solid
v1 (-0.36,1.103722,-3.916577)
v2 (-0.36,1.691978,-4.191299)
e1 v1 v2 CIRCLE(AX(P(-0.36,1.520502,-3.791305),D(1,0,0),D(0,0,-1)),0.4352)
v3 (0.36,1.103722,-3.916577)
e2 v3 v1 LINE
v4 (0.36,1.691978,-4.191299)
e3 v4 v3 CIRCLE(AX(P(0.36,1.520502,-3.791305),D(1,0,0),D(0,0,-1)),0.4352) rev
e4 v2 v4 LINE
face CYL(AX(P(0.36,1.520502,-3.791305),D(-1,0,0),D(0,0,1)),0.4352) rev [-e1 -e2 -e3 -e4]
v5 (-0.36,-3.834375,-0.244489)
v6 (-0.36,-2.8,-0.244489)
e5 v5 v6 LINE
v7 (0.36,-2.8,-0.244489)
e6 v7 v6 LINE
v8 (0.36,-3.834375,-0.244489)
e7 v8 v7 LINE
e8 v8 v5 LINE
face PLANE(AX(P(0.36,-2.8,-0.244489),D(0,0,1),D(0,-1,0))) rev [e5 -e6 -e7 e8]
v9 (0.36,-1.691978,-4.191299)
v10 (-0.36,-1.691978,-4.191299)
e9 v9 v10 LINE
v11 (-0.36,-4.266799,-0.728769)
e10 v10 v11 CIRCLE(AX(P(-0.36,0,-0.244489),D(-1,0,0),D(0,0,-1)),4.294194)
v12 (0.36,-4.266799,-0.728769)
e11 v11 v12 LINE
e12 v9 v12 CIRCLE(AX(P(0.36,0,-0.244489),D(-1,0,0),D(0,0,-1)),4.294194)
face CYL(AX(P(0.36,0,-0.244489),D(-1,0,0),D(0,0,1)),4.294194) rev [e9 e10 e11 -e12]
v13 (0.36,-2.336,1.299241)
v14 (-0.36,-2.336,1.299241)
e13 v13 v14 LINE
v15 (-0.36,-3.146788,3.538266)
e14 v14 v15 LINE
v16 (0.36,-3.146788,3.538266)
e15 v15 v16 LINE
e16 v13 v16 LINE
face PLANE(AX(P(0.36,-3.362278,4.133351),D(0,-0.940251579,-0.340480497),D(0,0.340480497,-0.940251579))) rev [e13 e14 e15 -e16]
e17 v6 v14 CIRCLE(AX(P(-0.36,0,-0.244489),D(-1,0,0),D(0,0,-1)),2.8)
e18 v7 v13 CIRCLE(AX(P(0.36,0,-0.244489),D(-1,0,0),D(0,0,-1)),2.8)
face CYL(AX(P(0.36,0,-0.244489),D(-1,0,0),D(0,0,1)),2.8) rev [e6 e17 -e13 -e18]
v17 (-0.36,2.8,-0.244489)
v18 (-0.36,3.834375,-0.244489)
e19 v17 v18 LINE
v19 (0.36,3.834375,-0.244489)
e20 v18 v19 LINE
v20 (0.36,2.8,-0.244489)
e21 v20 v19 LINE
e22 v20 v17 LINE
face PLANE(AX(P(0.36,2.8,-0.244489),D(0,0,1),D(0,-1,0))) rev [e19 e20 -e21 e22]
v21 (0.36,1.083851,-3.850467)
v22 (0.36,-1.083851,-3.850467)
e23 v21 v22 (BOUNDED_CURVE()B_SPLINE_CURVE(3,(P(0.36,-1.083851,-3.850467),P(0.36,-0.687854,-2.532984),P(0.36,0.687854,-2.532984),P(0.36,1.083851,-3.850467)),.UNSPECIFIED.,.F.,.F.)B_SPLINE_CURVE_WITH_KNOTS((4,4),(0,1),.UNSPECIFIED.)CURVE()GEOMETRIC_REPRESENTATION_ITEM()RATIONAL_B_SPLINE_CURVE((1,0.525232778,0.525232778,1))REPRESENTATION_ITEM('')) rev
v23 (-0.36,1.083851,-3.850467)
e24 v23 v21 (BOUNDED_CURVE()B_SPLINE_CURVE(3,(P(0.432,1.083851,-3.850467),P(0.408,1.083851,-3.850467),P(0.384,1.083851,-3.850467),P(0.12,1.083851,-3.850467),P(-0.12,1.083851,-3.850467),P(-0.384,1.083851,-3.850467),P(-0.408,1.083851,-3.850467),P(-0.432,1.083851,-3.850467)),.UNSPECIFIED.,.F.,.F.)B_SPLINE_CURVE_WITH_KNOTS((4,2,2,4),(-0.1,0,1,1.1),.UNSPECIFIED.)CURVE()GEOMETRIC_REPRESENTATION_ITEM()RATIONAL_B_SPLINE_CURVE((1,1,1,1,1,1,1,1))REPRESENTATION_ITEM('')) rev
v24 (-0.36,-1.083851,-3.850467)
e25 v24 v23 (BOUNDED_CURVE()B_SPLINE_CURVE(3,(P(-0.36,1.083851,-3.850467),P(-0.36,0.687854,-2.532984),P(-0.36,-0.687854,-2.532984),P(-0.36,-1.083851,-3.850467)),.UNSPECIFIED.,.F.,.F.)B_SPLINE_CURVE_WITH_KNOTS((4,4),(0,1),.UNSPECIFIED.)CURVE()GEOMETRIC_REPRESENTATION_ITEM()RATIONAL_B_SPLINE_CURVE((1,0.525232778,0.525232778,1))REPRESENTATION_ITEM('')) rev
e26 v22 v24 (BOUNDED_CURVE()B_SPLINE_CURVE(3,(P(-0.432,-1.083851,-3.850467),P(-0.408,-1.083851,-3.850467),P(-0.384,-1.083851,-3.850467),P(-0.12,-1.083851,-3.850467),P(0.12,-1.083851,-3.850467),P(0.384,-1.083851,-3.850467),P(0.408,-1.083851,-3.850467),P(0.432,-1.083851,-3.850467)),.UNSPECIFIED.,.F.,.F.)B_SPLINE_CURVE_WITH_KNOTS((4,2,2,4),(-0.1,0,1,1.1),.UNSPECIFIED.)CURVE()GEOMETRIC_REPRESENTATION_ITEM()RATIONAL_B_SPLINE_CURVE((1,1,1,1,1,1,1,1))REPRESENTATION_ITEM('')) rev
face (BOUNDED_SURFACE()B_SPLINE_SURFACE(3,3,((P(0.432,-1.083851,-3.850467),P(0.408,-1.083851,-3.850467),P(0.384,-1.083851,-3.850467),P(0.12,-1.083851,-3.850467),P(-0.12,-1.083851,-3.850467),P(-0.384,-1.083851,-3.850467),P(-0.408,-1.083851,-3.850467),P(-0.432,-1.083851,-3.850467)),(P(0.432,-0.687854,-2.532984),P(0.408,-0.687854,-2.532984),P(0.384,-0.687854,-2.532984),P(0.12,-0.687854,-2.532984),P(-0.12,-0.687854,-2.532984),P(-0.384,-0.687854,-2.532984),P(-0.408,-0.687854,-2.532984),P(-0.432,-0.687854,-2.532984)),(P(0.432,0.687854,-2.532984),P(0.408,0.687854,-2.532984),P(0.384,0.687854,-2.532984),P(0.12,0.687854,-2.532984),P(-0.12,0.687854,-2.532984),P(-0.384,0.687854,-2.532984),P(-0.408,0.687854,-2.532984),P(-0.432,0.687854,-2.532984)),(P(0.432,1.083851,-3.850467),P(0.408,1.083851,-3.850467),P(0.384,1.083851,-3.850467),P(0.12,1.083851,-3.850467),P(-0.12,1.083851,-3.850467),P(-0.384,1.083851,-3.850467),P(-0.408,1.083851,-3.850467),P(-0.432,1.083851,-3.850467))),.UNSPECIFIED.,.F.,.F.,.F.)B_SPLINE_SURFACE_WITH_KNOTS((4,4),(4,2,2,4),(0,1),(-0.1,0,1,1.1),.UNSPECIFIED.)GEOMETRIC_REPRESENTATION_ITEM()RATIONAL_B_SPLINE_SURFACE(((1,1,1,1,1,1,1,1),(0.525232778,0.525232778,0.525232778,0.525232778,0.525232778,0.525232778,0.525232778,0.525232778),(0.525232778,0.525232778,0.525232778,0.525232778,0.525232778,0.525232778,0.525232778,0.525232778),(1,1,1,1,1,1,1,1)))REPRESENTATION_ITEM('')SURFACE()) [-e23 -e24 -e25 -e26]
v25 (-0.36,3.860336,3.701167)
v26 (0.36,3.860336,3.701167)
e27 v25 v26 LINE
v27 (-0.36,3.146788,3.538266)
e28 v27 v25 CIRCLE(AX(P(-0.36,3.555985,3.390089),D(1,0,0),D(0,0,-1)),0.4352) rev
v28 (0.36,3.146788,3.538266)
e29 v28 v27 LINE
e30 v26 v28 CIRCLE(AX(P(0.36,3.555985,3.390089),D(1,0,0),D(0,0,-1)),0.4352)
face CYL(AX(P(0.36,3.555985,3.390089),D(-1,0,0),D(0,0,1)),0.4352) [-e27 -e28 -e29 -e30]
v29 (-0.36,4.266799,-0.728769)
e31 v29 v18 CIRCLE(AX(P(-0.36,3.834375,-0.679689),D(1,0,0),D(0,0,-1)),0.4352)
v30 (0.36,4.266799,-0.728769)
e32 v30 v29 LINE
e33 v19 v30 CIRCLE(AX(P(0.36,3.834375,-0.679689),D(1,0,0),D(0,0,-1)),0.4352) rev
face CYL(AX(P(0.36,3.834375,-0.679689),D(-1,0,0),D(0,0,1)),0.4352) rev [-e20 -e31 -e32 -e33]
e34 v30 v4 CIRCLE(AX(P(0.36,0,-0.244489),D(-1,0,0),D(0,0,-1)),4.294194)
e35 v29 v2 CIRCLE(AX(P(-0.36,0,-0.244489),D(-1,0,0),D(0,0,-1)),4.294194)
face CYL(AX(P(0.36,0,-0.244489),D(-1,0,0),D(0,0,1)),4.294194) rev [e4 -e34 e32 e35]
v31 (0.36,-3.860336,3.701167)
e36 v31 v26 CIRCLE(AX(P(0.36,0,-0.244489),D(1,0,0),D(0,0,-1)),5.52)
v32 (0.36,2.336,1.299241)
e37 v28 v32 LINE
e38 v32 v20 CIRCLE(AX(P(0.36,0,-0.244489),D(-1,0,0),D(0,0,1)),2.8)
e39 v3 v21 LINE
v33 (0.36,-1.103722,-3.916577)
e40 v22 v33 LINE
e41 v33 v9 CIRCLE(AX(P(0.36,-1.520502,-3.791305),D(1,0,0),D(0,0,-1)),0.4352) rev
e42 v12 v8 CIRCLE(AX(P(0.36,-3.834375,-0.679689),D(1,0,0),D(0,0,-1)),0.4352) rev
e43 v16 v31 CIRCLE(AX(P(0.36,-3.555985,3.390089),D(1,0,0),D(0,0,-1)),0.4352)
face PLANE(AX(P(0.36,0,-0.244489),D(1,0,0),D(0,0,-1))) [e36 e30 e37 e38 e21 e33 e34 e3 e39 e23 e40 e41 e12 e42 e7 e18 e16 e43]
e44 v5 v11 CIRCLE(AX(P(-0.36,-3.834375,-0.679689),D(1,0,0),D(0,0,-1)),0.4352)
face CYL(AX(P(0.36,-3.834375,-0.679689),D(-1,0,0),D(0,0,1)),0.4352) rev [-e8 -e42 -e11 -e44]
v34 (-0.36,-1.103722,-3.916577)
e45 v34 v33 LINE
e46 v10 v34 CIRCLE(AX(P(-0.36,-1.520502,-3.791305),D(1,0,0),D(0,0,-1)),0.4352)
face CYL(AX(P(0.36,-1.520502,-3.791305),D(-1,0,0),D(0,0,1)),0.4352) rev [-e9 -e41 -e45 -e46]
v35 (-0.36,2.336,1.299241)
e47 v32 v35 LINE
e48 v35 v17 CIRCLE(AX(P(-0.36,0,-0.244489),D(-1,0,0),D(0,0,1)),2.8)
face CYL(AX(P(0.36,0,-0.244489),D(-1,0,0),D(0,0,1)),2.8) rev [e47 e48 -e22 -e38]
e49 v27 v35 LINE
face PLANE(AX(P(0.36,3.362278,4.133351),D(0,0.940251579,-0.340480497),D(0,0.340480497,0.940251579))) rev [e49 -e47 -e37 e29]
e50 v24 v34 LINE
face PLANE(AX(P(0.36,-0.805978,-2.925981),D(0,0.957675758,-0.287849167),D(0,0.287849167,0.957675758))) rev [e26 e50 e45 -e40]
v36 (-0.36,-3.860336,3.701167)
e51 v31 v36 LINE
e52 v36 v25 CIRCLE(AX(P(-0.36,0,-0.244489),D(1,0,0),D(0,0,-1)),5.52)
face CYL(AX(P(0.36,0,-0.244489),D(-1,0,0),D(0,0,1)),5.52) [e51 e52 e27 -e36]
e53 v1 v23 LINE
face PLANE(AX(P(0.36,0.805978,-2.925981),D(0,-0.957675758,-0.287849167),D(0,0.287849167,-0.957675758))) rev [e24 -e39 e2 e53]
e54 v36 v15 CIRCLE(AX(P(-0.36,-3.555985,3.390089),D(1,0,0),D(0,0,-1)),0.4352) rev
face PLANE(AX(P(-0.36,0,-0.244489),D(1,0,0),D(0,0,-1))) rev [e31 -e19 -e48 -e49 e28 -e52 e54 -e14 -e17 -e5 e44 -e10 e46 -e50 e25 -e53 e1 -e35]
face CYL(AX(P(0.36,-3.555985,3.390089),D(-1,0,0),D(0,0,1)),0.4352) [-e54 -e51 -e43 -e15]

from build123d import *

# Parameters (mm, degrees)
EXTRUDE1_DEPTH = 0.45
FILLET2_START  = -0.45
FILLET2_DEPTH  = 0.9
FILLET1_R      = 0.544
SCALE1_SCALE   = 0.8


with BuildPart() as part:
    # Sketch1 → Extrude1 (new, symmetric)
    with BuildSketch(Plane(origin=(0, 0, 0), x_dir=(0, 0, -1), z_dir=(1, 0, 0))):
        with BuildLine():
            Line((-5.472300811, -4.20284711), (-1.929663183, -2.92))
            ThreePointArc((-1.929663183, -2.92), (-1.007472084, -3.351865152), (0, -3.5))
            Line((0, -3.5), (0, -5.367741935))
            ThreePointArc((0, -5.367741935), (3.203041928, -4.30733977), (5.140556326, -1.545100044))
            Line((5.140556326, -1.545100044), (3.351865152, -1.007472084))
            ThreePointArc((3.351865152, -1.007472084), (3.5, 0), (3.351865152, 1.007472084))
            Line((3.351865152, 1.007472084), (5.140556326, 1.545100044))
            ThreePointArc((5.140556326, 1.545100044), (3.203041928, 4.30733977), (0, 5.367741935))
            Line((0, 5.367741935), (0, 3.5))
            ThreePointArc((0, 3.5), (-1.007472084, 3.351865152), (-1.929663183, 2.92))
            Line((-1.929663183, 2.92), (-5.472300811, 4.20284711))
            ThreePointArc((-5.472300811, 4.20284711), (6.9, 0), (-5.472300811, -4.20284711))
        make_face()
    extrude(amount=EXTRUDE1_DEPTH, both=True)

    # Fillet2: read off the stored shape, not the designer's step
    # Fillet2 outline → Fillet2 (cut)
    with BuildSketch(Plane.YZ.offset(FILLET2_START)):
        with BuildLine():
            Line((-1.007472084, -3.351865152), (-1.35481354, -4.507472084))
            add(Edge.make_bspline(
                [(-1.35481354, -4.507472084), (-1.184355647, -3.940357738), (-0.701331375, -3.5), (0, -3.5)],
                knots=[0, 0, 0, 0, 0.5, 0.5, 0.5, 0.5], degree=3, weights=[1, 0.762616389, 0.643924583, 0.643924583]))
            ThreePointArc((0, -3.5), (-0.509152219, -3.462768259), (-1.007472084, -3.351865152))
        make_face()
        with BuildLine():
            ThreePointArc((1.007472084, -3.351865152), (0.509152221, -3.462768259), (2e-09, -3.5))
            add(Edge.make_bspline(
                [(2e-09, -3.5), (0.701331375, -3.5), (1.184355647, -3.940357738), (1.35481354, -4.507472084)],
                knots=[0.5, 0.5, 0.5, 0.5, 1, 1, 1, 1], degree=3, weights=[0.643924583, 0.643924583, 0.762616389, 1]))
            Line((1.35481354, -4.507472084), (1.007472084, -3.351865152))
        make_face()
    extrude(amount=FILLET2_DEPTH, mode=Mode.SUBTRACT)

    # Fillet1
    fillet1_edges = [part.edges().sort_by_distance(p)[0] for p in [
        (0, -5.367741935, 0),
        (0, 5.367741935, 0),
        (0, -4.20284711, 5.472300811),
        (0, 4.20284711, 5.472300811),
        (0, -1.545100044, -5.140556326),
        (0, 1.545100044, -5.140556326),
    ]]
    fillet(fillet1_edges, radius=FILLET1_R)


with BuildPart() as part_1:
    # Scale1: scaled about (0, 0, -1.222397064)
    add(part.part.scale(SCALE1_SCALE).moved(Location((0, 0, -0.244479413))))


solid = part_1.part
